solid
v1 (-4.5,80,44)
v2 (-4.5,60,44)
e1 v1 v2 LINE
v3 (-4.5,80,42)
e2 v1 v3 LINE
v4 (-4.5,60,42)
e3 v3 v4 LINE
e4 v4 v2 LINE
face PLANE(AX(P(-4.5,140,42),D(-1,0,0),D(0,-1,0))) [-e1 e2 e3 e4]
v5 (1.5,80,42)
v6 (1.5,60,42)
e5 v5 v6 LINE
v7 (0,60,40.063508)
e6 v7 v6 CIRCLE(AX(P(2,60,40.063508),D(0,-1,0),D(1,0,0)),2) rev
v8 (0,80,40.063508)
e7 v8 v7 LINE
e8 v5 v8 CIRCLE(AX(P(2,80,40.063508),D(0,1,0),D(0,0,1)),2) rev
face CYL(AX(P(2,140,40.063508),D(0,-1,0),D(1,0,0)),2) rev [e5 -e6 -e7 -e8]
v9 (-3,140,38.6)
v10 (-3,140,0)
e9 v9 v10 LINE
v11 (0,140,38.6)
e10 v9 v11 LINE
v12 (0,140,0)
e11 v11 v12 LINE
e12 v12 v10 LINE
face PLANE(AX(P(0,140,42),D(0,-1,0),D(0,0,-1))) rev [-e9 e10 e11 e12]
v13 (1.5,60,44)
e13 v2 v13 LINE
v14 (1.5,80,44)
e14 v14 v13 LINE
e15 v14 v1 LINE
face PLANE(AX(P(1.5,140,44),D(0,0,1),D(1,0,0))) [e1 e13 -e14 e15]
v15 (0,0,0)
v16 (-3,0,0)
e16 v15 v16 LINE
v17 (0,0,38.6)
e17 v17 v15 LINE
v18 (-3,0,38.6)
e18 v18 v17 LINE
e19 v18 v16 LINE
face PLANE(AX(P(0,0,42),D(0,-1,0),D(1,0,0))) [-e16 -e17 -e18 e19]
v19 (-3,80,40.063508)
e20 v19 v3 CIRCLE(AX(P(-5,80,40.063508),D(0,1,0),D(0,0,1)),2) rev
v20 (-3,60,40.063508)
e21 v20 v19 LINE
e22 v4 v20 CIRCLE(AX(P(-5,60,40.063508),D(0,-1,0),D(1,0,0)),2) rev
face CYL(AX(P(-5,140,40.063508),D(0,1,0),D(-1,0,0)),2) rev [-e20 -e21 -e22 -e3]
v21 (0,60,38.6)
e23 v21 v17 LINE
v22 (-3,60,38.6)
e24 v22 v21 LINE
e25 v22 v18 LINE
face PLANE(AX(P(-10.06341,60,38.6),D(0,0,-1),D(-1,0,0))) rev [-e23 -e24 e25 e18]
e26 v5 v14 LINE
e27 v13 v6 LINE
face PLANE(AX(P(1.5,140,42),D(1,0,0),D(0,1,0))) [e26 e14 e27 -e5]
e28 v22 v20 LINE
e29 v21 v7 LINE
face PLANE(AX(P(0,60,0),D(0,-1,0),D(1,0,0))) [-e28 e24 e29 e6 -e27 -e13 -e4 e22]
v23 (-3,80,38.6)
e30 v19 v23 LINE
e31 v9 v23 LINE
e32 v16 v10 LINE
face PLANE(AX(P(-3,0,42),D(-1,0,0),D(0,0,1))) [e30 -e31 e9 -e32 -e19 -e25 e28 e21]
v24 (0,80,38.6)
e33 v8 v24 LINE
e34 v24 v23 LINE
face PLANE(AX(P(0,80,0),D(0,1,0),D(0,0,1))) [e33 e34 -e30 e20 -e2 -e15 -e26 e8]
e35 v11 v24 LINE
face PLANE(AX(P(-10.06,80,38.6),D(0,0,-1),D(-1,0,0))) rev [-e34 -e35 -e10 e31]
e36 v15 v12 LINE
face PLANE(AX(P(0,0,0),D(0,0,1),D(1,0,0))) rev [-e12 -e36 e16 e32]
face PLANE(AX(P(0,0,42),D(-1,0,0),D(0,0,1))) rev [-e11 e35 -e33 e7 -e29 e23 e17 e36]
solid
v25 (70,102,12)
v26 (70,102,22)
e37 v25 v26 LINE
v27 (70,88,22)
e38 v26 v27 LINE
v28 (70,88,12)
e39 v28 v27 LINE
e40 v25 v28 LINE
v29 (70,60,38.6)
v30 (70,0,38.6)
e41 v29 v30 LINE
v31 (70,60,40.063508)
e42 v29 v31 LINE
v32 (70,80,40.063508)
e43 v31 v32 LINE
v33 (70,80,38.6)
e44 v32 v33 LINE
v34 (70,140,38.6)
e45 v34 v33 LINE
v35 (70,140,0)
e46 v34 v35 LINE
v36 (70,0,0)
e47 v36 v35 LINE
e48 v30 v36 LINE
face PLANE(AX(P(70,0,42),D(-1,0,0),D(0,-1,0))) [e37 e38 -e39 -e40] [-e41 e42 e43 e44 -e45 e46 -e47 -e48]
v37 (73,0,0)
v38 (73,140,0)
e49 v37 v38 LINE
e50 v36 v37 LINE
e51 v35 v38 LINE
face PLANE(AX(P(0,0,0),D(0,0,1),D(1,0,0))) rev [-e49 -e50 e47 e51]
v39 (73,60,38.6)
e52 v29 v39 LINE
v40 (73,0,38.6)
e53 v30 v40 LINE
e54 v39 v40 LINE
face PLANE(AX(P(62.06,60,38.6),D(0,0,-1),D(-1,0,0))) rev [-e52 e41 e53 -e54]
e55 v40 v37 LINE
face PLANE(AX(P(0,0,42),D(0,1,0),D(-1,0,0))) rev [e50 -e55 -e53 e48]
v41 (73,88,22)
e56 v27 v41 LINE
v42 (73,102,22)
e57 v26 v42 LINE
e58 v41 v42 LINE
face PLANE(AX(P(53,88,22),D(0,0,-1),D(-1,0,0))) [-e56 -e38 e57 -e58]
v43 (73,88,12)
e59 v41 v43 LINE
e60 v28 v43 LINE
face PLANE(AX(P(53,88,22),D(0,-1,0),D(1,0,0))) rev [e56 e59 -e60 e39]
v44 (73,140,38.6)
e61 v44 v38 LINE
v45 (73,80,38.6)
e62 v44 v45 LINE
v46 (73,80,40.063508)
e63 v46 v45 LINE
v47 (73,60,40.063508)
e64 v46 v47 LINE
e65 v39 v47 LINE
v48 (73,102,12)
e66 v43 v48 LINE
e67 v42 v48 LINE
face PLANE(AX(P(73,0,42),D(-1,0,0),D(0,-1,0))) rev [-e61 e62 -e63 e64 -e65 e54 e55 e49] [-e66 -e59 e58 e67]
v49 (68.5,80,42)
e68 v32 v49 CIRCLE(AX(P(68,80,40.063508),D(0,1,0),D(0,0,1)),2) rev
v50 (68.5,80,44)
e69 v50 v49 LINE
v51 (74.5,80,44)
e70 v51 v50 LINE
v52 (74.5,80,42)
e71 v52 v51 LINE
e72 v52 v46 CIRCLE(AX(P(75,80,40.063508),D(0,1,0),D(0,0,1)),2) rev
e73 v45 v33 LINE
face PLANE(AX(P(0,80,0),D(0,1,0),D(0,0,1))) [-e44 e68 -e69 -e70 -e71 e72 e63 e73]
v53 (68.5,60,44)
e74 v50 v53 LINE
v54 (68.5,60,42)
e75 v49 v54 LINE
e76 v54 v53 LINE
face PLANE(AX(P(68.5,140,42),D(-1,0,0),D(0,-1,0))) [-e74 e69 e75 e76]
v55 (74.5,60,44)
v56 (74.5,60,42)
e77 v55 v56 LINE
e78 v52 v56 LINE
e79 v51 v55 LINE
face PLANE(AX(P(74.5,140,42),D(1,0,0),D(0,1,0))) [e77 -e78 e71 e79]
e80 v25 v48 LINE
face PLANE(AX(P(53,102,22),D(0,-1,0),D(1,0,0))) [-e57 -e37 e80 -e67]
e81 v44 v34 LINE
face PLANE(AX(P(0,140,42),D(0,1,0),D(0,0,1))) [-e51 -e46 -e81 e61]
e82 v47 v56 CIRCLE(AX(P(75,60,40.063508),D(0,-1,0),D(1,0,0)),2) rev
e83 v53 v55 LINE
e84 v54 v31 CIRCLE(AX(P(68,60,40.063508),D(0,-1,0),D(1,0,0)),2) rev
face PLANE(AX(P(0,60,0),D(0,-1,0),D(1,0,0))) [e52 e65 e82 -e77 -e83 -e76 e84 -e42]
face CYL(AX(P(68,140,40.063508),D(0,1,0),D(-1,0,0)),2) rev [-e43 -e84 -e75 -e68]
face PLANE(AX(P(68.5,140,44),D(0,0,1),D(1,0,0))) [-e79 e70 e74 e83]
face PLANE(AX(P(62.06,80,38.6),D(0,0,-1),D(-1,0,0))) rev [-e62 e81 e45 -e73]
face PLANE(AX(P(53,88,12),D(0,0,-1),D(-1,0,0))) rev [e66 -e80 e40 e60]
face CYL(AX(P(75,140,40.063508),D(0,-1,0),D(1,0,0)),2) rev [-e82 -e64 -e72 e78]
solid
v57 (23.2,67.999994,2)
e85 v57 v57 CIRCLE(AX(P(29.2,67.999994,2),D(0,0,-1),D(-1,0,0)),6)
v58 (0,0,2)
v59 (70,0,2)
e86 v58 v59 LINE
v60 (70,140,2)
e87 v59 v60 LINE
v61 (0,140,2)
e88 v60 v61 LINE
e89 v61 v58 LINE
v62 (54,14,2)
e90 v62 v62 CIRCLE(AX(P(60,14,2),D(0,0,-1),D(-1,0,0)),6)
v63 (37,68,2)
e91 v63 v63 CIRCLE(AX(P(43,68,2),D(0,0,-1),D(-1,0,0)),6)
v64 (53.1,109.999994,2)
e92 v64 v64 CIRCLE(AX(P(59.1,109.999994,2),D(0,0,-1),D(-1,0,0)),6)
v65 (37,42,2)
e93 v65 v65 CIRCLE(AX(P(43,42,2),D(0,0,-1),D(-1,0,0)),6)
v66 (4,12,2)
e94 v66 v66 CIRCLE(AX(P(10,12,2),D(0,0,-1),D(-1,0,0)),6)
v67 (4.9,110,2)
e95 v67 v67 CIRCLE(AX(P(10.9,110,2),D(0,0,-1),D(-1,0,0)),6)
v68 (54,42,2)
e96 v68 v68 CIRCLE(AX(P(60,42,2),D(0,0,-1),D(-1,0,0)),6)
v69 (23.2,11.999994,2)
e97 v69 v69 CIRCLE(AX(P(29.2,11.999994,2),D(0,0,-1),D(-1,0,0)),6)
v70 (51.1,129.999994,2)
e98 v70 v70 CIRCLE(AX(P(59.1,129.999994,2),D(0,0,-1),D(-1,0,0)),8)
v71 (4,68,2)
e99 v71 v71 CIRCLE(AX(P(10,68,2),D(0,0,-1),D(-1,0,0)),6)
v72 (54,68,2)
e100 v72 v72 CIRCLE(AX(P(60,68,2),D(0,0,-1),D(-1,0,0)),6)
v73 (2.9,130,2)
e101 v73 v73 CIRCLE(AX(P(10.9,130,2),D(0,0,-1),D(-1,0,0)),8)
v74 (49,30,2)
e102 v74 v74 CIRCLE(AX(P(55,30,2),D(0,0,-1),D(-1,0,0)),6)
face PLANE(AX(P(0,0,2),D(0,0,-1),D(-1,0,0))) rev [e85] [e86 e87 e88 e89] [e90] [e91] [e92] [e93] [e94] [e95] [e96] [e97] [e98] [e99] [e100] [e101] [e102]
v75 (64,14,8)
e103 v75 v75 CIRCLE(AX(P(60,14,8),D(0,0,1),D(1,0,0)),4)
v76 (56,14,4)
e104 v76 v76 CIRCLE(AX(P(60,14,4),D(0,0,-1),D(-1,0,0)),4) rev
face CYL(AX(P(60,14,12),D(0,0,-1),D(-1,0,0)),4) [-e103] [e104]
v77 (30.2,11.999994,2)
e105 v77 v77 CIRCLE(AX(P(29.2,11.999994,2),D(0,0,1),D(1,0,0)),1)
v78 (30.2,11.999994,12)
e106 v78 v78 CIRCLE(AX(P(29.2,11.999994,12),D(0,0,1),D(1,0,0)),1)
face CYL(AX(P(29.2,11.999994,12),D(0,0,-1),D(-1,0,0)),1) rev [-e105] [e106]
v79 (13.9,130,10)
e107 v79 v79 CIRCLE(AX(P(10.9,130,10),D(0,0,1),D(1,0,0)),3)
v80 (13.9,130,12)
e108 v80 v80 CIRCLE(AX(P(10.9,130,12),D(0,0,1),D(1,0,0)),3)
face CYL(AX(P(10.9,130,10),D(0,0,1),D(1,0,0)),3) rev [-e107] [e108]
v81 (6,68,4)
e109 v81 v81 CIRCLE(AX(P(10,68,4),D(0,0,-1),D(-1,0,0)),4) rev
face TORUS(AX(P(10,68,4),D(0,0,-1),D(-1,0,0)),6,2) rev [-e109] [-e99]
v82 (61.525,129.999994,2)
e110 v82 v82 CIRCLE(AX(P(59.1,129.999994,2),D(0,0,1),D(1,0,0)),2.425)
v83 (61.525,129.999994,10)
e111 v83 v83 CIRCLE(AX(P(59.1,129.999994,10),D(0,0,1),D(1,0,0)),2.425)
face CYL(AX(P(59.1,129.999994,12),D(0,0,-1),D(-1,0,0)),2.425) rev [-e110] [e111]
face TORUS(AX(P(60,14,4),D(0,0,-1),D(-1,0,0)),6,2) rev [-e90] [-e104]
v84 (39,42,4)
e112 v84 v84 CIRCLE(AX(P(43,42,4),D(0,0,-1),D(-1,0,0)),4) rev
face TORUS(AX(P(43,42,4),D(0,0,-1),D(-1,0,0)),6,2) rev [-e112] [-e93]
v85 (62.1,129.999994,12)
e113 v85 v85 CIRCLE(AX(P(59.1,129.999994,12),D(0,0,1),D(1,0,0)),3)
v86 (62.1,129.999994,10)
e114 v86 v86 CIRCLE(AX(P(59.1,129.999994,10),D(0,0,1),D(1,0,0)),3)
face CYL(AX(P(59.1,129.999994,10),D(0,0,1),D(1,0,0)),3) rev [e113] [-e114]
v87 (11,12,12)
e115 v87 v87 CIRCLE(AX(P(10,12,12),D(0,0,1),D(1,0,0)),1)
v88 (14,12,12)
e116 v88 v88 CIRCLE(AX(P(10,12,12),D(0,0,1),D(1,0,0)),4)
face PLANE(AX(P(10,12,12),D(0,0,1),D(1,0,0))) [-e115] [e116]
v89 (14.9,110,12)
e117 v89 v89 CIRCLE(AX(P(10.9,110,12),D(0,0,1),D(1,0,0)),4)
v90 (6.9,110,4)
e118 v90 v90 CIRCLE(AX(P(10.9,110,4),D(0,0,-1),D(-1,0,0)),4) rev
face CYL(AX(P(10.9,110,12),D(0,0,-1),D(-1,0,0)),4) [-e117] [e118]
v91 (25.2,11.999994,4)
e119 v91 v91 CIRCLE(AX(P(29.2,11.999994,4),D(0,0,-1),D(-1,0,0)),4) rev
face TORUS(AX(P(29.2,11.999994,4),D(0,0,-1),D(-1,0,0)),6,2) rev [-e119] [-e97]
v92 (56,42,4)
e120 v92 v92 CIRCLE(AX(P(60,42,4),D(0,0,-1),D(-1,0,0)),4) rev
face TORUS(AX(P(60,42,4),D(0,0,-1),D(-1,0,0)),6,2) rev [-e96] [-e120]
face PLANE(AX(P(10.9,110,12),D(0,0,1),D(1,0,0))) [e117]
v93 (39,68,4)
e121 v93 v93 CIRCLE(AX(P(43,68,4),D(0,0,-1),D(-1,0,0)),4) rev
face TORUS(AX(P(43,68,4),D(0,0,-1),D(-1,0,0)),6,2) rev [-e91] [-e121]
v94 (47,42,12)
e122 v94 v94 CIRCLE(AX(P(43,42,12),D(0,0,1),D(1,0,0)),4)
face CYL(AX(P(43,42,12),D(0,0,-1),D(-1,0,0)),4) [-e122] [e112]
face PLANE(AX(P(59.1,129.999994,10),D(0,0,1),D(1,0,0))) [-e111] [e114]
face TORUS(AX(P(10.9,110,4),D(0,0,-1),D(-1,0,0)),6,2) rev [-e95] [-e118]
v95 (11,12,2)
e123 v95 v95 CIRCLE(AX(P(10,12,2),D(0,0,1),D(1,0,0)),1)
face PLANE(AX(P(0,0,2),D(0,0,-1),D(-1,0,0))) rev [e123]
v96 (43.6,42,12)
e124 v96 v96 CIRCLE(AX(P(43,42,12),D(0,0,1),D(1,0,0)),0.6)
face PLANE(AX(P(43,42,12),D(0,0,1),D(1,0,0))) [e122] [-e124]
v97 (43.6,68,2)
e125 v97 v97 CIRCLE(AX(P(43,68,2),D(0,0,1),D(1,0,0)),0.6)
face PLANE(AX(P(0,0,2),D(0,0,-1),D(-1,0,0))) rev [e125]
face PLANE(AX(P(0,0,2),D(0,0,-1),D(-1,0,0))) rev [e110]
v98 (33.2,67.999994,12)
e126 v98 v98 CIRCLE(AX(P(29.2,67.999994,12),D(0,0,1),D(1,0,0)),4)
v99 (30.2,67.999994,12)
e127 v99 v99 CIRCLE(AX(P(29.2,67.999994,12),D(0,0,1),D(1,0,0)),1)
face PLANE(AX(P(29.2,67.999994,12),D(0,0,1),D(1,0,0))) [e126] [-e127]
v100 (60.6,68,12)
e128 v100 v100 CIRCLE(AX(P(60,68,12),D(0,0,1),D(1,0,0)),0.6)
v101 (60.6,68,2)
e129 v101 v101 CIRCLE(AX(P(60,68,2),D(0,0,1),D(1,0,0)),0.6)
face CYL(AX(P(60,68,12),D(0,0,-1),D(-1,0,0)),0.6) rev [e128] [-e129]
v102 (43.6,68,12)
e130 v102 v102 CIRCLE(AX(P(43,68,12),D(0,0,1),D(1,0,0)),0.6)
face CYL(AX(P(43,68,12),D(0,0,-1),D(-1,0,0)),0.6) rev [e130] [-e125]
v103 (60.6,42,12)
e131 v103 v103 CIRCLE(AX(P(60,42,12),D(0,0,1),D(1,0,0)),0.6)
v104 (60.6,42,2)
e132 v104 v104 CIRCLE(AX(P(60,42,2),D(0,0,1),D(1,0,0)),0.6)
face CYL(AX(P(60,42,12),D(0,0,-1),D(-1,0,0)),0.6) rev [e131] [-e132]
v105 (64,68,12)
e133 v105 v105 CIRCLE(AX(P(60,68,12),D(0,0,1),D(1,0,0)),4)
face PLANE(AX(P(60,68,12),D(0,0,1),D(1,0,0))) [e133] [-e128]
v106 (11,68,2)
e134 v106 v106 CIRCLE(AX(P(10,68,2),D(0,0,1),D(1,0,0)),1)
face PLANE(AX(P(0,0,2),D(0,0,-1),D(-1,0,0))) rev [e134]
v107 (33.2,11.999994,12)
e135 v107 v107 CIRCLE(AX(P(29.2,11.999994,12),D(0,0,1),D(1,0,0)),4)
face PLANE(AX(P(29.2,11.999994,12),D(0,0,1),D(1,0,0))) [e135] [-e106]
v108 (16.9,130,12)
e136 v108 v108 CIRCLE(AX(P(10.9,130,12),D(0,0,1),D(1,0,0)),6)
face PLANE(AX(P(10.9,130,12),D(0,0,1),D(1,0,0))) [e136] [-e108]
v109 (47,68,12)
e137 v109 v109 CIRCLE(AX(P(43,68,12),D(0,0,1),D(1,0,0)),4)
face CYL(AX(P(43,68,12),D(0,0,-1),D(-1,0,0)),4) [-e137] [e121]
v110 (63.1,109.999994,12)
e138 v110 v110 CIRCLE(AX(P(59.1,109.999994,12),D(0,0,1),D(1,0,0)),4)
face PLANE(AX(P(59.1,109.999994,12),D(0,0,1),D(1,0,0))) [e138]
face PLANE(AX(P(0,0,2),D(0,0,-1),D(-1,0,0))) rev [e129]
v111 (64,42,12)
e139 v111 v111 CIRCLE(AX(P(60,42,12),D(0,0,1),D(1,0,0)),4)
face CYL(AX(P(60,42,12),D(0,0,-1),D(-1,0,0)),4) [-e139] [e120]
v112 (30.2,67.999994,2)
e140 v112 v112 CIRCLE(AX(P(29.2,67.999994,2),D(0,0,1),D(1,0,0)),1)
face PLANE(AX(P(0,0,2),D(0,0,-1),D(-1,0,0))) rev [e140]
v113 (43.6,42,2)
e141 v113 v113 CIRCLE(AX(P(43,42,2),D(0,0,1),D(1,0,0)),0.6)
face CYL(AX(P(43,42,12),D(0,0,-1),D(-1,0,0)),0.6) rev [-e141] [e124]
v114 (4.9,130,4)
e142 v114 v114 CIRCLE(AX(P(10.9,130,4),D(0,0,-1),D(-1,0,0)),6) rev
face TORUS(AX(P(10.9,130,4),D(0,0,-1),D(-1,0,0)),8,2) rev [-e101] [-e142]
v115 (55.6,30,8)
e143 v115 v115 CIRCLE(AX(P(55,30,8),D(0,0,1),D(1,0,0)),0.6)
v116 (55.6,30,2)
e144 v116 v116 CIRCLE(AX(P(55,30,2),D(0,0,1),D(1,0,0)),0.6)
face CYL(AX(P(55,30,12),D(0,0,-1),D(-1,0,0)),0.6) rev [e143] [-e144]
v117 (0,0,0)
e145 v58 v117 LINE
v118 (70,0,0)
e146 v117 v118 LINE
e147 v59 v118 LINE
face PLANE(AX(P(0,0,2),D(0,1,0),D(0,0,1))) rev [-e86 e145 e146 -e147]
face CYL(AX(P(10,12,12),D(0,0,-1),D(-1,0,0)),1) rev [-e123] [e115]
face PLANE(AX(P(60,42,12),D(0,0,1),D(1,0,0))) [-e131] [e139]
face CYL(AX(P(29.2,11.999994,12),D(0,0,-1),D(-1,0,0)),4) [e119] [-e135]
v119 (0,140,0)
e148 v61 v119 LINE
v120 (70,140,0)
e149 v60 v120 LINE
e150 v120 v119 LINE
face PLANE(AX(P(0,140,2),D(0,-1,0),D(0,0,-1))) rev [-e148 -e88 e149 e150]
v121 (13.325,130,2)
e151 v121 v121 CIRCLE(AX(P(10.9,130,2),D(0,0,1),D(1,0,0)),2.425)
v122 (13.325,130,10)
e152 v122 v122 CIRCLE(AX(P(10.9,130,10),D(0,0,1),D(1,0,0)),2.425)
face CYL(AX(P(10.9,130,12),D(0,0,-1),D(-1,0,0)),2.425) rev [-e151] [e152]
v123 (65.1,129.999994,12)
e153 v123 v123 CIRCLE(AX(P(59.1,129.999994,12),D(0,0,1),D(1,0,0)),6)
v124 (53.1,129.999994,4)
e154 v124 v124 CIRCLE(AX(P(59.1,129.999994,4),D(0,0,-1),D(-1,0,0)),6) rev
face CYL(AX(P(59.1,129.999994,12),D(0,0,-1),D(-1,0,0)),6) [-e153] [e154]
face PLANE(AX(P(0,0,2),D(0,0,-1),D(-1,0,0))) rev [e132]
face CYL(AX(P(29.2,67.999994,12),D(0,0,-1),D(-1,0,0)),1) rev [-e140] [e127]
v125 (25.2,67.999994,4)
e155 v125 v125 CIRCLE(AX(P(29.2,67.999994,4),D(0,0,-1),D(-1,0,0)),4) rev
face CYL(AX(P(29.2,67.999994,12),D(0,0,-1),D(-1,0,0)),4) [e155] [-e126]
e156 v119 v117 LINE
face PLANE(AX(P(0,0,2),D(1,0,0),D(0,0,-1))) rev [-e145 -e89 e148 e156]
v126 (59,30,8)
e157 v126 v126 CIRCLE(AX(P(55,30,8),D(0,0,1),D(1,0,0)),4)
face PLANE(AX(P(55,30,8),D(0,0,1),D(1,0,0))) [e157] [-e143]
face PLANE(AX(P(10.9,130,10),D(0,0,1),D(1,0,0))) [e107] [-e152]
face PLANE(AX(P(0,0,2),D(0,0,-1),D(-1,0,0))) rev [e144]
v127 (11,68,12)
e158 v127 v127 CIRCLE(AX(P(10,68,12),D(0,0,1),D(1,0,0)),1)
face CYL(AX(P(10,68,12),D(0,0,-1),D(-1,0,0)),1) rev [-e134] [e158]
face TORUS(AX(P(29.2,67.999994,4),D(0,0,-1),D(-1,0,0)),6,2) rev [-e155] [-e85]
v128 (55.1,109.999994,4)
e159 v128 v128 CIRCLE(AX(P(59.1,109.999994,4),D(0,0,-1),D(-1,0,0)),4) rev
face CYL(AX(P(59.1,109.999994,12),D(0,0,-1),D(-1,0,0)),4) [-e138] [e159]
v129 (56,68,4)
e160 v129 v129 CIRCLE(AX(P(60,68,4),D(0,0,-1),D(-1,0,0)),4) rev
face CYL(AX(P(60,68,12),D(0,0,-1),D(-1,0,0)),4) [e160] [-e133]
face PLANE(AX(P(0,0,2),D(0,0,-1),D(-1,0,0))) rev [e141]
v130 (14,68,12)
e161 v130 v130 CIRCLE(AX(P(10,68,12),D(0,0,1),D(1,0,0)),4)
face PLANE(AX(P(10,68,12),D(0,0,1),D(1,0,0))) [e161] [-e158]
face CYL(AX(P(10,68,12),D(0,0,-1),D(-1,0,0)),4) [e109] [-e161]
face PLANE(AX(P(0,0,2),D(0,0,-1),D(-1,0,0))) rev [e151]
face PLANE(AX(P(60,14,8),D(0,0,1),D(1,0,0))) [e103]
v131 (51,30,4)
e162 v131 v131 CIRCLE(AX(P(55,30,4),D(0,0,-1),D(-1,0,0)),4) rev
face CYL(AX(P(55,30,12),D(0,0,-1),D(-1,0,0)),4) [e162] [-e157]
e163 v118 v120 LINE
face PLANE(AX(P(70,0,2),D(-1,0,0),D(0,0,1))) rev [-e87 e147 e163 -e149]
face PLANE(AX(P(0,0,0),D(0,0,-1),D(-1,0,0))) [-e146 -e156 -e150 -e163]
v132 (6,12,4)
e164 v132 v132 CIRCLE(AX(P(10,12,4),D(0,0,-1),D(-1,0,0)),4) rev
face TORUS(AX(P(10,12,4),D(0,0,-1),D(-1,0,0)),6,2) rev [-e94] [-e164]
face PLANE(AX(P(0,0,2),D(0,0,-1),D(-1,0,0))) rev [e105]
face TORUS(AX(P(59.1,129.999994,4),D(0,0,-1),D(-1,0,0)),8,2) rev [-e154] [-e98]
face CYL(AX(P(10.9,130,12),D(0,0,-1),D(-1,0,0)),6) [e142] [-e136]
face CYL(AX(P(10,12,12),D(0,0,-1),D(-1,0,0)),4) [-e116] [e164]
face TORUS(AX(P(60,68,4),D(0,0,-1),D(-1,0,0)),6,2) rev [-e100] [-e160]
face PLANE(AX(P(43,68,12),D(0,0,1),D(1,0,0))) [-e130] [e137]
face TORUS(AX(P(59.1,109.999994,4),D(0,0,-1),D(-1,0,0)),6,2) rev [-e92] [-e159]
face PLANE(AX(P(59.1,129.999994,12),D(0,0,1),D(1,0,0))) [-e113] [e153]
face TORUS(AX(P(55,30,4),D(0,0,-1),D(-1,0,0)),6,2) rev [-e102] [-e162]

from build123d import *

# Parameters (mm, degrees)
SKICA1_W                  = 70
SKICA1_H                  = 140
P_IDAT_VYSUNUT_M1_DEPTH   = 2
SKICA2_R                  = 4
SKICA2_R_2                = 1
SKICA2_R_3                = 0.6
SKICA2_R_4                = 6
SKICA2_R_5                = 2.425
P_IDAT_VYSUNUT_M2_DEPTH   = 10
SKICA4_W                  = 3
SKICA4_H                  = 140
P_IDAT_VYSUNUT_M3_DEPTH   = 42
P_IDAT_VYSUNUT_M3_2_DEPTH = 42
SKICA5_W                  = 10
SKICA5_H                  = 14
ODEBRAT_VYSUNUT_M2_DEPTH  = 20
ZAOBLIT1_R                = 2
SKICA7_W                  = 6
SKICA7_H                  = 2
P_IDAT_VYSUNUT_M4_DEPTH   = 140
ZAOBLIT2_R                = 2
ZAOBLIT3_R                = 2
ODEBRAT_START             = -4
SKICA8_R                  = 4
ODEBRAT_VYSUNUT_M3_DEPTH  = 4
SKICA9_W                  = 18
SKICA9_H                  = 10
ODEBRAT_VYSUNUT_M4_DEPTH  = 60
SKICA10_W                 = 18
SKICA10_H                 = 10
ODEBRAT_VYSUNUT_M5_DEPTH  = 60
SKICA11_R                 = 3
ODEBRAT_VYSUNUT_M6_DEPTH  = 2


with BuildPart() as part:
    # Skica1 → Přidat vysunutím1 (new body)
    with BuildSketch(Plane.XY):
        with Locations((35, 70)):
            Rectangle(SKICA1_W, SKICA1_H)
    extrude(amount=P_IDAT_VYSUNUT_M1_DEPTH)

    # Skica2 → Přidat vysunutím2 (add)
    # profile 1 of 14: a face of its own
    with BuildSketch(Plane.XY.offset(2)):
        with Locations(Location((10, 68, 0), (0, 0, 180))):
            Circle(SKICA2_R)
        with Locations((10, 68)):
            Circle(SKICA2_R_2, mode=Mode.SUBTRACT)
    # profile 2 of 14: a face of its own
    with BuildSketch(Plane.XY.offset(2)):
        with Locations(Location((29.2, 67.999993937, 0), (0, 0, 180))):
            Circle(SKICA2_R)
        with Locations((29.2, 67.999993937)):
            Circle(SKICA2_R_2, mode=Mode.SUBTRACT)
    # profile 3 of 14: a face of its own
    with BuildSketch(Plane.XY.offset(2)):
        with Locations(Location((43, 68, 0), (0, 0, 180))):
            Circle(SKICA2_R)
        with Locations((43, 68)):
            Circle(SKICA2_R_3, mode=Mode.SUBTRACT)
    # profile 4 of 14: a face of its own
    with BuildSketch(Plane.XY.offset(2)):
        with Locations(Location((60, 68, 0), (0, 0, 180))):
            Circle(SKICA2_R)
        with Locations((60, 68)):
            Circle(SKICA2_R_3, mode=Mode.SUBTRACT)
    # profile 5 of 14: a face of its own
    with BuildSketch(Plane.XY.offset(2)):
        with Locations(Location((60, 42, 0), (0, 0, 180))):
            Circle(SKICA2_R)
        with Locations((60, 42)):
            Circle(SKICA2_R_3, mode=Mode.SUBTRACT)
    # profile 6 of 14: a face of its own
    with BuildSketch(Plane.XY.offset(2)):
        with Locations(Location((55, 30, 0), (0, 0, 180))):
            Circle(SKICA2_R)
        with Locations((55, 30)):
            Circle(SKICA2_R_3, mode=Mode.SUBTRACT)
    # profile 7 of 14: a face of its own
    with BuildSketch(Plane.XY.offset(2)):
        with Locations(Location((29.2, 11.999993937, 0), (0, 0, 180))):
            Circle(SKICA2_R)
        with Locations((29.2, 11.999993937)):
            Circle(SKICA2_R_2, mode=Mode.SUBTRACT)
    # profile 8 of 14: a face of its own
    with BuildSketch(Plane.XY.offset(2)):
        with Locations(Location((10, 12, 0), (0, 0, 180))):
            Circle(SKICA2_R)
        with Locations((10, 12)):
            Circle(SKICA2_R_2, mode=Mode.SUBTRACT)
    # profile 9 of 14: a face of its own
    with BuildSketch(Plane.XY.offset(2)):
        with Locations(Location((10.9, 130, 0), (0, 0, 180))):
            Circle(SKICA2_R_4)
        with Locations((10.9, 130)):
            Circle(SKICA2_R_5, mode=Mode.SUBTRACT)
    # profile 10 of 14: a face of its own
    with BuildSketch(Plane.XY.offset(2)):
        with Locations(Location((59.1, 129.999993937, 0), (0, 0, 180))):
            Circle(SKICA2_R_4)
        with Locations((59.1, 129.999993937)):
            Circle(SKICA2_R_5, mode=Mode.SUBTRACT)
    # profile 11 of 14: a face of its own
    with BuildSketch(Plane.XY.offset(2)):
        with Locations(Location((43, 42, 0), (0, 0, 180))):
            Circle(SKICA2_R)
        with Locations((43, 42)):
            Circle(SKICA2_R_3, mode=Mode.SUBTRACT)
    # profile 12 of 14: a face of its own
    with BuildSketch(Plane.XY.offset(2)):
        with Locations(Location((10.9, 110, 0), (0, 0, 180))):
            Circle(SKICA2_R)
    # profile 13 of 14: a face of its own
    with BuildSketch(Plane.XY.offset(2)):
        with Locations(Location((59.1, 109.999993937, 0), (0, 0, 180))):
            Circle(SKICA2_R)
    # profile 14 of 14: a face of its own
    with BuildSketch(Plane.XY.offset(2)):
        with Locations(Location((60, 14, 0), (0, 0, 180))):
            Circle(SKICA2_R)
    extrude(amount=P_IDAT_VYSUNUT_M2_DEPTH)

    # Zaoblit1
    zaoblit1_edges = [part.edges().sort_by_distance(p)[0] for p in [
        (14, 68, 2),
        (33.2, 67.999993937, 2),
        (47, 68, 2),
        (64, 68, 2),
        (64, 42, 2),
        (59, 30, 2),
        (33.2, 11.999993937, 2),
        (14, 12, 2),
        (16.9, 130, 2),
        (65.1, 129.999993937, 2),
        (47, 42, 2),
        (14.9, 110, 2),
        (63.1, 109.999993937, 2),
        (64, 14, 2),
    ]]
    fillet(zaoblit1_edges, radius=ZAOBLIT1_R)

    # Skica8 → Odebrat vysunutím3 (cut)
    with BuildSketch(Plane.XY.offset(12).offset(ODEBRAT_START)):
        with Locations(Location((55, 30, 0), (0, 0, 180))):
            Circle(SKICA8_R)
        with Locations(Location((60, 14, 0), (0, 0, 180))):
            Circle(SKICA8_R)
    extrude(amount=ODEBRAT_VYSUNUT_M3_DEPTH, mode=Mode.SUBTRACT)

    # Skica11 → Odebrat vysunutím6 (cut)
    with BuildSketch(Plane.XY.offset(12)):
        with Locations((10.9, 130)):
            Circle(SKICA11_R)
        with Locations((59.1, 129.999993937)):
            Circle(SKICA11_R)
    extrude(amount=-ODEBRAT_VYSUNUT_M6_DEPTH, mode=Mode.SUBTRACT)


with BuildPart() as body_2:
    # Skica4 → Přidat vysunutím3 (new body)
    with BuildSketch(Plane.XY):
        with Locations((-1.5, 70)):
            Rectangle(SKICA4_W, SKICA4_H)
    extrude(amount=P_IDAT_VYSUNUT_M3_DEPTH)



with BuildPart() as body_3:
    # Skica4 → P_idat vysunut_m3 2 (new body)
    with BuildSketch(Plane.XY):
        with Locations((71.5, 70)):
            Rectangle(SKICA4_W, SKICA4_H)
    extrude(amount=P_IDAT_VYSUNUT_M3_2_DEPTH)

    # Skica5 → Odebrat vysunutím2 (cut)
    with BuildSketch(Plane(origin=(73, 0, 0), x_dir=(0, 0, -1), z_dir=(1, 0, 0))):
        with Locations((-17, 95)):
            Rectangle(SKICA5_W, SKICA5_H)
    extrude(amount=-ODEBRAT_VYSUNUT_M2_DEPTH, mode=Mode.SUBTRACT)


with BuildPart() as body_2_1:
    add(body_2.part)

    add(body_3.part)  # Přidat vysunutím4 merges body 3
    # Skica7 → Přidat vysunutím4 (add)
    with BuildSketch(Plane.XZ):
        with Locations((-1.5, 43)):
            Rectangle(SKICA7_W, SKICA7_H)
        with Locations((71.5, 43)):
            Rectangle(SKICA7_W, SKICA7_H)
    extrude(amount=-P_IDAT_VYSUNUT_M4_DEPTH)

    # Zaoblit2
    # the kernel refuses this fillet: 2 mm, written as the material it adds along each edge
    with BuildSketch(Plane(origin=(-3, 0, 42), x_dir=(-1, 0, 0), z_dir=(0, 1, 0)), Plane(origin=(0, 140, 42), x_dir=(1, 0, 0), z_dir=(0, -1, 0))) as zaoblit2_piece_1:
        with BuildLine():
            CenterArc((2, -1.936491673), ZAOBLIT2_R, 104.477512186, 75.522487814)
            Line((0, -1.936491673), (-0.04, -1.936491673))
            Line((-0.04, -1.936491673), (-0.04, 0))
            Line((-0.04, 0), (0, 0.04))
            ThreePointArc((0, 0.04), (0.75, 0.04), (1.49, 0.038729833))
            Line((1.49, 0.038729833), (1.5, 0))
        make_face()
    extrude(amount=140)

    # Zaoblit3
    # the kernel refuses this fillet: 2 mm, written as the material it adds along each edge
    with BuildSketch(Plane(origin=(73, 0, 42), x_dir=(1, 0, 0), z_dir=(0, 1, 0)), Plane(origin=(70, 140, 42), x_dir=(-1, 0, 0), z_dir=(0, -1, 0))) as zaoblit3_piece_1:
        with BuildLine():
            CenterArc((2, 1.936491673), ZAOBLIT3_R, 180, 75.522487814)
            Line((0, 1.936491673), (-0.04, 1.936491673))
            Line((-0.04, 1.936491673), (-0.04, 0))
            Line((-0.04, 0), (0, -0.04))
            ThreePointArc((0, -0.04), (0.75, -0.04), (1.49, -0.038729833))
            Line((1.49, -0.038729833), (1.5, 0))
        make_face()
    extrude(amount=140)

    # Skica9 → Odebrat vysunutím4 (cut)
    with BuildSketch(Plane.XZ):
        with Locations((-1.063409624, 43.6)):
            Rectangle(SKICA9_W, SKICA9_H)
        with Locations((71.06, 43.6)):
            Rectangle(SKICA9_W, SKICA9_H)
    extrude(amount=-ODEBRAT_VYSUNUT_M4_DEPTH, mode=Mode.SUBTRACT)

    # Skica10 → Odebrat vysunutím5 (cut)
    with BuildSketch(Plane(origin=(0, 140, 0), x_dir=(1, 0, 0), z_dir=(0, 1, 0))):
        with Locations((-1.06, -43.6)):
            Rectangle(SKICA10_W, SKICA10_H)
        with Locations((71.06, -43.6)):
            Rectangle(SKICA10_W, SKICA10_H)
    extrude(amount=-ODEBRAT_VYSUNUT_M5_DEPTH, mode=Mode.SUBTRACT)


solid = Compound([part.part, body_2_1.part])
